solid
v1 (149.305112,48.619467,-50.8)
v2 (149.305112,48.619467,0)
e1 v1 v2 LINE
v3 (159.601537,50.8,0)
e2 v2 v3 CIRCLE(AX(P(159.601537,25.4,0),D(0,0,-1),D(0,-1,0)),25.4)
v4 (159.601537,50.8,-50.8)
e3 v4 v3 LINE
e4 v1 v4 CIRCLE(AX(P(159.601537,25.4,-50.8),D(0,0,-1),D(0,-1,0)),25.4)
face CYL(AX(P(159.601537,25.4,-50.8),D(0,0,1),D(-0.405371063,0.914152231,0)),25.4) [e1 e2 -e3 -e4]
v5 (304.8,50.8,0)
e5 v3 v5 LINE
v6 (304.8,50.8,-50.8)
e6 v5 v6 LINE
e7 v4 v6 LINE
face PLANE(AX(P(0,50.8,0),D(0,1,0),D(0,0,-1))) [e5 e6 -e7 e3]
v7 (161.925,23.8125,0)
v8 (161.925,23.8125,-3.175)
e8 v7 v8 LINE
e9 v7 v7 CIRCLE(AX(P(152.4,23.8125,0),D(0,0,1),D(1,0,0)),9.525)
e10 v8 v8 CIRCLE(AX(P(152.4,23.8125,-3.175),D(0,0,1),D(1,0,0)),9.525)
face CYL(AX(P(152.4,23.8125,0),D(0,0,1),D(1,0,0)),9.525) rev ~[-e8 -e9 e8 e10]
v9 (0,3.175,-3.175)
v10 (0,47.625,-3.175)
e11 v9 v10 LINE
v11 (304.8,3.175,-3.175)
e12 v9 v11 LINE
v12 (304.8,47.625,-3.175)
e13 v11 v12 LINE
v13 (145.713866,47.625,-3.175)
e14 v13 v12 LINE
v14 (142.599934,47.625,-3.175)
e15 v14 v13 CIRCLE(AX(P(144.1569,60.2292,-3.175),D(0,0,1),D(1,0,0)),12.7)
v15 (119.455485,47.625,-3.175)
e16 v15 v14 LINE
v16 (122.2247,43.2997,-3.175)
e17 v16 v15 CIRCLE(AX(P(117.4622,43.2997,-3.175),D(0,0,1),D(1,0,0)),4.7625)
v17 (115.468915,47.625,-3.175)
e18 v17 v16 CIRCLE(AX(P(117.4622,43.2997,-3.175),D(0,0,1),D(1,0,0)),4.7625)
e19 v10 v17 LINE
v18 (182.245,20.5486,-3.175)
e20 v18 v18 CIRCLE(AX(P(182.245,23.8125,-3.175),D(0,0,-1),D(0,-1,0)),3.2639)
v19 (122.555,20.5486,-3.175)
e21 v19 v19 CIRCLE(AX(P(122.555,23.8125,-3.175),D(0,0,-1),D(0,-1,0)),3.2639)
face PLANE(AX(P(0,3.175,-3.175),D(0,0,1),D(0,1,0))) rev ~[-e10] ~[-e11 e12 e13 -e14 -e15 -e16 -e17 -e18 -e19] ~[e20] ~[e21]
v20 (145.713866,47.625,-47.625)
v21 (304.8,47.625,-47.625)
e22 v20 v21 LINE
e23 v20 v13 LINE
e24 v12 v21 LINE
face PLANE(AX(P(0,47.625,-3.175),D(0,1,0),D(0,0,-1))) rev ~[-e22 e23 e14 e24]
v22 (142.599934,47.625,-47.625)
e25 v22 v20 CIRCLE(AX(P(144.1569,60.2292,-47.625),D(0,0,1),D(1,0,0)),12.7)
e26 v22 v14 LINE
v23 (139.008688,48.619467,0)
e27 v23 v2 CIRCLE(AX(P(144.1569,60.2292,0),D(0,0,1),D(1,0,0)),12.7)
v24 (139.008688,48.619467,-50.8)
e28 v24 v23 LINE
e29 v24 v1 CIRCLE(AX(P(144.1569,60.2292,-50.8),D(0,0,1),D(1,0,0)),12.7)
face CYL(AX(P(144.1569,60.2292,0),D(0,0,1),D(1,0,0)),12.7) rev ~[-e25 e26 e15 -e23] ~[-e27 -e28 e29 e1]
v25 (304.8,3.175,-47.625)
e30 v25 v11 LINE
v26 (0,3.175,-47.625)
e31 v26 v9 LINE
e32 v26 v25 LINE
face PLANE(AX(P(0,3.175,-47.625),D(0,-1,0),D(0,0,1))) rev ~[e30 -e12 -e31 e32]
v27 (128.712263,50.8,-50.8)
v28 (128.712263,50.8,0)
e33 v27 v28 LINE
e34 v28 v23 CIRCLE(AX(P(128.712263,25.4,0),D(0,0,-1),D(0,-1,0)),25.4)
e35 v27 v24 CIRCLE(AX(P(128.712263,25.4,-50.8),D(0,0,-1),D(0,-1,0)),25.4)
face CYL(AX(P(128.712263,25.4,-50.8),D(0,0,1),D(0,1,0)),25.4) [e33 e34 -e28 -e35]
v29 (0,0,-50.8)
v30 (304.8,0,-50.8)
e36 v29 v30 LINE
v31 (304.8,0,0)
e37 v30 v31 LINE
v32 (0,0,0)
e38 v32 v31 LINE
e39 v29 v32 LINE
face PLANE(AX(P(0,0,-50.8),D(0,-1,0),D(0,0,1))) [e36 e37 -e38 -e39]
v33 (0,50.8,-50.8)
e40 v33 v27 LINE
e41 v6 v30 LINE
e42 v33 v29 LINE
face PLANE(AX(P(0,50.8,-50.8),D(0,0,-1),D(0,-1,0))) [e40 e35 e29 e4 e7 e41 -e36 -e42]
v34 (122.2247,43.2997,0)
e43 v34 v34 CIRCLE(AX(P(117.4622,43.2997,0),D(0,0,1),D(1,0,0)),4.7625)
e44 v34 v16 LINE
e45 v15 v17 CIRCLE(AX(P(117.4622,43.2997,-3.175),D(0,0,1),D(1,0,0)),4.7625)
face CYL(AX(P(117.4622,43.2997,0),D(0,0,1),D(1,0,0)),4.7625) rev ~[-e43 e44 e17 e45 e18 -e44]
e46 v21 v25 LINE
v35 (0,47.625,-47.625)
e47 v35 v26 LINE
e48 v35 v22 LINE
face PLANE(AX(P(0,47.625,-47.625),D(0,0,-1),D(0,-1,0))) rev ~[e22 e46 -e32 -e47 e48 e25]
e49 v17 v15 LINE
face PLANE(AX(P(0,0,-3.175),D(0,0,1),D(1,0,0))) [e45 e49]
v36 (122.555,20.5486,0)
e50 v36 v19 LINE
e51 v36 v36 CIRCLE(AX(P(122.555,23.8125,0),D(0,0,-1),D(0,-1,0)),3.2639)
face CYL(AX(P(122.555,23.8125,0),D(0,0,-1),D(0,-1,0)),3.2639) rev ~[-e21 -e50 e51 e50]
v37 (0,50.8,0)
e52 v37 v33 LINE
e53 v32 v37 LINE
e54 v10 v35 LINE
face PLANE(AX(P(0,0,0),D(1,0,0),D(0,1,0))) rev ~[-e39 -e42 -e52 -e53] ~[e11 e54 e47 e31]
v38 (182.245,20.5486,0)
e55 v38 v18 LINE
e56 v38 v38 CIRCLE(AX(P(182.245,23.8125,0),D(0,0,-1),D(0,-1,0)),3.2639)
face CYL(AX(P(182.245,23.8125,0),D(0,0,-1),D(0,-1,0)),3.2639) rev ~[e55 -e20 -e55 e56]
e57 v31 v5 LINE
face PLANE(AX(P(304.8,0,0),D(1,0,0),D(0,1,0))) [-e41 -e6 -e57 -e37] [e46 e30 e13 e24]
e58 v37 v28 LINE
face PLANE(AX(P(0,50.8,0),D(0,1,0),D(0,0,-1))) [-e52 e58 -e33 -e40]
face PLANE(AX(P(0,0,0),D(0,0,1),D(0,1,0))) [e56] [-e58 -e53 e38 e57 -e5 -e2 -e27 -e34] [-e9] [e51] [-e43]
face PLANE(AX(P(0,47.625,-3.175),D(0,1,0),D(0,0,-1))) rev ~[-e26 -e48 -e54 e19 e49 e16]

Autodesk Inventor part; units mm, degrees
ref_plane "YZ Plane" through (0, 0, 0) normal (1, 0, 0) x (0, 1, 0)
ref_plane "XZ Plane" through (0, 0, 0) normal (0, 1, 0) x (-1, 0, 0)
ref_plane "XY Plane" through (0, 0, 0) normal (0, 0, 1) x (1, 0, 0)
sketch "Main Outline" plane through (0, 0, 0) normal (0, 0, 1) x (1, 0, 0)
  line L0 (0, 0) -> (304.8, 0) construction
  line L1 (304.8, 0) -> (304.8, 50.8) construction
  line L2 (304.8, 50.8) -> (0, 50.8) construction
  line L3 (0, 50.8) -> (0, 0) construction
  line L4 (0, 50.8) -> (0, 53.34) construction
  line L5 (0, 53.34) -> (304.8, 53.34) construction
  line L6 (304.8, 53.34) -> (304.8, 50.8) construction
  circle A0 centre (152.4, 23.8125) radius 17.4625 construction
  line L7 (152.4, 23.8125) -> (152.4, 0) construction
  circle A1 centre (152.4, 23.8125) radius 27.94 construction
  circle A2 centre (152.4, 23.8125) radius 21.59 construction
  line L8 (152.4, 23.8125) -> (144.1569, 60.2292) construction
  circle A3 centre (144.1569, 60.2292) radius 15.24 construction
  circle A4 centre (144.1569, 60.2292) radius 8.89 construction
  circle A5 centre (144.1569, 60.2292) radius 14.2875 construction
  arc A6 (163.8162, 72.0089) -> (128.198, 43.7805) centre (144.1569, 60.2292) ccw construction
  circle A7 centre (98.8106, 85.598) radius 32.258 construction
  circle A8 centre (124.5097, 147.0273) radius 32.258 construction
  circle A9 centre (174.158, 102.6533) radius 32.258 construction
  circle A10 centre (144.1569, 60.2292) radius 11.1125 construction
  circle A11 centre (152.4, 23.8125) radius 49.53 construction
  line L9 (144.1569, 60.2292) -> (124.5097, 147.0273) construction
  line L10 (144.1569, 60.2292) -> (98.8106, 85.598) construction
  line L11 (98.8106, 85.598) -> (174.158, 102.6533) construction
  line L12 (174.158, 102.6533) -> (144.1569, 60.2292) construction
  circle A12 centre (98.8106, 85.598) radius 9.5493 construction
  arc A13 (172.0498, 111.9669) -> (183.1109, 99.3313) centre (174.158, 102.6533) ccw construction
  circle A14 centre (124.5097, 147.0273) radius 9.5493 construction
  line L13 (96.7024, 94.9117) -> (172.0498, 111.9669) construction
  line L14 (183.1109, 99.3313) -> (165.6438, 52.2565) construction
  line L15 (92.161, 78.7444) -> (128.198, 43.7805) construction
  line L16 (172.0498, 111.9669) -> (174.158, 102.6533) construction
  line L17 (174.158, 102.6533) -> (183.1109, 99.3313) construction
  arc A15 (183.1109, 99.3313) -> (172.0498, 111.9669) centre (174.158, 102.6533) ccw construction
  arc A16 (165.6438, 52.2565) -> (163.8162, 72.0089) centre (144.1569, 60.2292) ccw construction
  arc A17 (128.198, 43.7805) -> (165.6438, 52.2565) centre (144.1569, 60.2292) ccw construction
  circle A18 centre (124.4396, 147.337) radius 32.258 construction
  circle A19 centre (124.3695, 147.6466) radius 32.258 construction
  circle A20 centre (124.2994, 147.9563) radius 32.258 construction
  line L18 (124.5097, 147.0273) -> (124.2994, 147.9563) construction
  circle A21 centre (124.5798, 146.7176) radius 32.258 construction
  circle A22 centre (117.4622, 43.2997) radius 9.525 construction
  circle A23 centre (175.54, 56.4459) radius 9.525 construction
  line L19 (152.4, 23.8125) -> (117.4622, 43.2997) construction
  line L20 (152.4, 23.8125) -> (175.54, 56.4459) construction
  line L21 (117.4622, 43.2997) -> (98.8106, 85.598) construction
  line L22 (175.54, 56.4459) -> (174.158, 102.6533) construction
  circle A24 centre (133.7342, 106.2753) radius 7.9375 construction
  line L23 (133.401, 150.5107) -> (165.496, 68.5894) construction
  circle A25 centre (152.4, 23.8125) radius 29.845 construction
  line L24 (114.985, 146.3422) -> (121.2977, 58.5849) construction
  circle A26 centre (99.0876, 85.443) radius 32.258 construction
  circle A27 centre (97.9793, 86.063) radius 32.258 construction
  line L25 (97.9793, 86.063) -> (98.8106, 85.598) construction
  circle A28 centre (98.2564, 85.908) radius 32.258 construction
  circle A29 centre (98.5335, 85.753) radius 32.258 construction
  circle A30 centre (152.4, 23.8125) radius 29.845 construction
  circle A31 centre (122.555, 23.8125) radius 6.35 construction
  circle A32 centre (179.3358, 36.6651) radius 6.35 construction
  line L26 (122.555, 23.8125) -> (152.4, 23.8125) construction
  line L27 (152.4, 23.8125) -> (182.245, 23.8125) construction
  circle A33 centre (182.245, 23.8125) radius 6.35 construction
  circle A34 centre (125.4642, 10.9599) radius 6.35 construction
  circle A35 centre (150.1885, 33.5827) radius 39.8623 construction
  line L28 (72.8944, 65.7819) -> (119.1902, 8.5205) construction
  circle A36 centre (174.708, 103.431) radius 32.258 construction
  line L29 (174.158, 102.6533) -> (174.708, 103.431) construction
  circle A37 centre (174.5246, 103.1717) radius 32.258 construction
  circle A38 centre (174.3413, 102.9125) radius 32.258 construction
  circle A39 centre (173.9747, 102.394) radius 32.258 construction
  line L30 (188.958, 24.3128) -> (206.0816, 95.9295) construction
  circle A40 centre (133.7342, 106.2753) radius 8.1693 construction
  arc A41 (85.4541, 115.7901) -> (94.2274, 135.7949) centre (79.2901, 130.4196) ccw construction
  arc A42 (156.6774, 149.9308) -> (173.2104, 135.6542) centre (172.4734, 151.5121) ccw construction
  line L31 (124.2994, 147.9563) -> (124.8602, 145.479) construction
  line L32 (114.3901, 145.7133) -> (114.9509, 143.236) construction
  line L33 (134.7695, 147.722) -> (134.2088, 150.1993) construction
  arc A43 (134.2088, 150.1993) -> (114.3901, 145.7133) centre (124.2994, 147.9563) ccw construction
  arc A44 (114.9509, 143.236) -> (134.7695, 147.722) centre (124.8602, 145.479) ccw construction
  line L34 (174.708, 103.431) -> (173.2414, 101.3571) construction
  line L35 (166.4126, 109.2972) -> (164.9461, 107.2234) construction
  line L36 (181.5368, 95.4909) -> (183.0033, 97.5647) construction
  arc A45 (183.0033, 97.5647) -> (166.4126, 109.2972) centre (174.708, 103.431) ccw construction
  arc A46 (164.9461, 107.2234) -> (181.5368, 95.4909) centre (173.2414, 101.3571) ccw construction
  line L37 (97.9793, 86.063) -> (100.196, 84.8229) construction
  line L38 (93.0188, 77.1963) -> (95.2355, 75.9562) construction
  line L39 (105.1564, 93.6897) -> (102.9398, 94.9298) construction
  arc A47 (102.9398, 94.9298) -> (93.0188, 77.1963) centre (97.9793, 86.063) ccw construction
  arc A48 (95.2355, 75.9562) -> (105.1564, 93.6897) centre (100.196, 84.8229) ccw construction
  circle A49 centre (117.4622, 43.2997) radius 3.9687 construction
  circle A50 centre (175.54, 56.4459) radius 3.9687 construction
  line L40 (152.4, 23.8125) -> (158.9889, -5.2961) construction
  arc A51 (89.3511, 54.6895) -> (85.9237, 49.6664) centre (88.3927, 51.6626) ccw construction
  arc A52 (201.2624, 75.7739) -> (196.006, 78.8314) centre (198.1744, 76.5122) ccw construction
  circle A53 centre (152.4, 23.8125) radius 14.224 construction
  circle A54 centre (133.7342, 106.2753) radius 3.9687 construction
  circle A55 centre (156.886, 3.9939) radius 6.35 construction
  circle A56 centre (156.886, 3.9939) radius 2.0828 construction
  circle A57 centre (152.4, 23.8125) radius 20.32 construction
  line L41 (132.9935, 29.8368) -> (152.4, 23.8125) construction
  line L42 (152.4, 23.8125) -> (167.3204, 37.6068) construction
  circle A58 centre (167.3204, 37.6068) radius 2.0828 construction
  circle A59 centre (167.3204, 37.6068) radius 3.9687 construction
  circle A60 centre (132.9935, 29.8368) radius 2.0828 construction
  circle A61 centre (132.9935, 29.8368) radius 3.9688 construction
  point P0 (173.9747, 102.394)
  point P1 (99.0876, 85.443)
  dimension "d18" = 99.06
  dimension "d58" = 64.516
  dimension "d86" = 64.516
  dimension "d0" = 304.8
  dimension "d1" = 50.8
  dimension "d2" = 2.54
  dimension "d3" = 34.925
  dimension "d4" = 23.8125
  dimension "d5" = 152.4
  dimension "d6" = 55.88
  dimension "d7" = 43.18
  dimension "d8" = 37.338
  dimension "d10" = 30.48
  dimension "d11" = 17.78
  dimension "d12" = 28.575
  dimension "d13" = 45.8366
  dimension "d14" = 64.516
  dimension "d15" = 64.516
  dimension "d16" = 64.516
  dimension "d17" = 22.225
  dimension "d19" = 51.9602
  dimension "d20" = 88.9939
  dimension "d21" = 19.0986
  dimension "d22" = 19.0986
  dimension "d23" = 19.0986
  dimension "d30" = 123.112
  dimension "d40" = 64.516
  dimension "d41" = 64.516
  dimension "d42" = 64.516
  dimension "d43" = 0.9525
  dimension "d44" = 0.3175
  dimension "d45" = 0.635
  dimension "d46" = 64.516
  dimension "d47" = 0.3175
  dimension "d48" = 19.05
  dimension "d49" = 19.05
  dimension "d50" = 40.005
  dimension "d51" = 40.005
  dimension "d52" = 46.228
  dimension "d54" = 46.228
  dimension "d55" = 15.875
  dimension "d56" = 41.4655
  dimension "d57" = 59.69
  dimension "d59" = 64.516
  dimension "d60" = 64.516
  dimension "d61" = 64.516
  dimension "d62" = 0.3175
  dimension "d63" = 0.3175
  dimension "d64" = 0.635
  dimension "d65" = 0.9525
  dimension "d73" = 12.7
  dimension "d74" = 12.7
  dimension "d76" = 59.69
  dimension "d78" = 12.7
  dimension "d79" = 12.7
  dimension "d80" = 64.516
  dimension "d81" = 0.9525
  dimension "d82" = 64.516
  dimension "d83" = 64.516
  dimension "d84" = 0.3175
  dimension "d85" = 0.635
  dimension "d88" = 0.3175
  dimension "d89" = 31.75
  dimension "d90" = 31.75
  dimension "d94" = 1.5875
  dimension "d95" = 20.32
  dimension "d96" = 1.5875
sketch "Upper CIM C-C Check" plane through (0, 0, 0) normal (0, 0, 1) x (1, 0, 0)
  arc A0 (3.4429, -22.6582) -> (3.4429, 22.6582) centre (0, 0) ccw construction
  arc A1 (90.4285, 9.4409) -> (90.4285, -9.4409) centre (88.9939, 0) ccw construction
  line L0 (88.9939, 0) -> (0, 0) construction
  line L1 (90.4285, 9.4409) -> (3.4429, 22.6582)
  line L2 (3.4429, -22.6582) -> (90.4285, -9.4409)
  arc A2 (90.4285, -9.4409) -> (90.4285, 9.4409) centre (88.9939, 0) ccw
  arc A3 (3.4429, 22.6582) -> (3.4429, -22.6582) centre (0, 0) ccw
  dimension "d24" = 45.8366
  dimension "d25" = 19.0986
  dimension "d26" = 78.9119
  dimension "d27" = 87.984
  dimension "d28" = 27.12
  dimension "d29" = 88.9939
sketch "Sketch3" plane through (0, 0, 0) normal (1, 0, 0) x (0, 1, 0)
  line L0 (0, 0) -> (50.8, 0)
  line L1 (50.8, 0) -> (50.8, -50.8)
  line L2 (50.8, -50.8) -> (0, -50.8)
  line L3 (0, -50.8) -> (0, 0)
  line L4 (3.175, -3.175) -> (47.625, -3.175)
  line L5 (47.625, -3.175) -> (47.625, -47.625)
  line L6 (47.625, -47.625) -> (3.175, -47.625)
  line L7 (3.175, -47.625) -> (3.175, -3.175)
  dimension "d115" = 50.8
  dimension "d116" = 50.8
  dimension "d117" = 44.45
  dimension "d118" = 44.45
  dimension "d119" = 3.175
  dimension "d120" = 3.175
extrude "Extrusion1" add sketch "Sketch3" along normal blind 304.8
sketch "Sketch4" plane through (0, 0, 0) normal (0, 0, 1) x (1, 0, 0)
  circle A0 centre (152.4, 23.8125) radius 9.525
  circle A1 centre (117.4622, 43.2997) radius 4.7625
  circle A2 centre (144.1569, 60.2292) radius 12.7
  point P0 (0, 0)
  point P1 (122.555, 23.8125)
  point P2 (125.4642, 10.9599)
  point P3 (182.245, 23.8125)
  point P4 (179.3358, 36.6651)
  dimension "d123" = 19.05
  dimension "d124" = 9.525
  dimension "d134" = 25.4
extrude "Extrusion2" cut sketch "Sketch4" against normal up to surface (3.175 mm away) contours A0 | A1
hole "Hole1" at (122.555, 23.8125, 0) at (182.245, 23.8125, 0) direction (0, 0, -1) diameter 6.5278 end up to surface clearance for "Flat Head Machine Screw (82)" size "1/4" standard "Ansi Unified Screw Threads"
extrude "Extrusion3" cut sketch "Sketch4" against normal up to surface (50.8 mm away) contours A2
fillet "Fillet1" radius 25.4 2 edges at (135.6493, 50.8, -25.4) (152.6645, 50.8, -25.4)
equation "\"d3\" = r10"
equation "\"d6\" = g44"
equation "\"d7\" = g34"
equation "\"d10\" = g24"
equation "\"d11\" = g14"
equation "\"d12\" = r8"
equation "\"d13\" = p48"
equation "\"d14\" = cim"
equation "\"d15\" = cim"
equation "\"d16\" = cim"
equation "\"d17\" = r6"
equation "\"d21\" = p20"
equation "\"d22\" = p20"
equation "\"d23\" = p20"
equation "\"d24\" = p48"
equation "\"d25\" = p20"
equation "\"d29\" = d20"
equation "\"g14\" = 17.78"
equation "\"g24\" = 30.48"
equation "\"g34\" = 43.18"
equation "\"g44\" = 55.88"
equation "\"p20\" = 19.09859"
equation "\"p48\" = 45.83662"
equation "\"r10\" = 34.925"
equation "\"r9\" = 31.75"
equation "\"r8\" = 28.575"
equation "\"r7\" = 25.4"
equation "\"r6\" = 22.225"
equation "\"r5\" = 19.05"
equation "\"r4\" = 15.875"
equation "\"r3\" = 12.7"
equation "\"cim\" = 64.516"
equation "\"act\" = 28.448"
equation "\"actL\" = 23.749"
equation "\"UpperCimCCCheck\" = 2 * d27 + d26 + d28"
equation "\"LowerBeltPathCCCheck\" = 267"
properties material "Aluminum 6061"
